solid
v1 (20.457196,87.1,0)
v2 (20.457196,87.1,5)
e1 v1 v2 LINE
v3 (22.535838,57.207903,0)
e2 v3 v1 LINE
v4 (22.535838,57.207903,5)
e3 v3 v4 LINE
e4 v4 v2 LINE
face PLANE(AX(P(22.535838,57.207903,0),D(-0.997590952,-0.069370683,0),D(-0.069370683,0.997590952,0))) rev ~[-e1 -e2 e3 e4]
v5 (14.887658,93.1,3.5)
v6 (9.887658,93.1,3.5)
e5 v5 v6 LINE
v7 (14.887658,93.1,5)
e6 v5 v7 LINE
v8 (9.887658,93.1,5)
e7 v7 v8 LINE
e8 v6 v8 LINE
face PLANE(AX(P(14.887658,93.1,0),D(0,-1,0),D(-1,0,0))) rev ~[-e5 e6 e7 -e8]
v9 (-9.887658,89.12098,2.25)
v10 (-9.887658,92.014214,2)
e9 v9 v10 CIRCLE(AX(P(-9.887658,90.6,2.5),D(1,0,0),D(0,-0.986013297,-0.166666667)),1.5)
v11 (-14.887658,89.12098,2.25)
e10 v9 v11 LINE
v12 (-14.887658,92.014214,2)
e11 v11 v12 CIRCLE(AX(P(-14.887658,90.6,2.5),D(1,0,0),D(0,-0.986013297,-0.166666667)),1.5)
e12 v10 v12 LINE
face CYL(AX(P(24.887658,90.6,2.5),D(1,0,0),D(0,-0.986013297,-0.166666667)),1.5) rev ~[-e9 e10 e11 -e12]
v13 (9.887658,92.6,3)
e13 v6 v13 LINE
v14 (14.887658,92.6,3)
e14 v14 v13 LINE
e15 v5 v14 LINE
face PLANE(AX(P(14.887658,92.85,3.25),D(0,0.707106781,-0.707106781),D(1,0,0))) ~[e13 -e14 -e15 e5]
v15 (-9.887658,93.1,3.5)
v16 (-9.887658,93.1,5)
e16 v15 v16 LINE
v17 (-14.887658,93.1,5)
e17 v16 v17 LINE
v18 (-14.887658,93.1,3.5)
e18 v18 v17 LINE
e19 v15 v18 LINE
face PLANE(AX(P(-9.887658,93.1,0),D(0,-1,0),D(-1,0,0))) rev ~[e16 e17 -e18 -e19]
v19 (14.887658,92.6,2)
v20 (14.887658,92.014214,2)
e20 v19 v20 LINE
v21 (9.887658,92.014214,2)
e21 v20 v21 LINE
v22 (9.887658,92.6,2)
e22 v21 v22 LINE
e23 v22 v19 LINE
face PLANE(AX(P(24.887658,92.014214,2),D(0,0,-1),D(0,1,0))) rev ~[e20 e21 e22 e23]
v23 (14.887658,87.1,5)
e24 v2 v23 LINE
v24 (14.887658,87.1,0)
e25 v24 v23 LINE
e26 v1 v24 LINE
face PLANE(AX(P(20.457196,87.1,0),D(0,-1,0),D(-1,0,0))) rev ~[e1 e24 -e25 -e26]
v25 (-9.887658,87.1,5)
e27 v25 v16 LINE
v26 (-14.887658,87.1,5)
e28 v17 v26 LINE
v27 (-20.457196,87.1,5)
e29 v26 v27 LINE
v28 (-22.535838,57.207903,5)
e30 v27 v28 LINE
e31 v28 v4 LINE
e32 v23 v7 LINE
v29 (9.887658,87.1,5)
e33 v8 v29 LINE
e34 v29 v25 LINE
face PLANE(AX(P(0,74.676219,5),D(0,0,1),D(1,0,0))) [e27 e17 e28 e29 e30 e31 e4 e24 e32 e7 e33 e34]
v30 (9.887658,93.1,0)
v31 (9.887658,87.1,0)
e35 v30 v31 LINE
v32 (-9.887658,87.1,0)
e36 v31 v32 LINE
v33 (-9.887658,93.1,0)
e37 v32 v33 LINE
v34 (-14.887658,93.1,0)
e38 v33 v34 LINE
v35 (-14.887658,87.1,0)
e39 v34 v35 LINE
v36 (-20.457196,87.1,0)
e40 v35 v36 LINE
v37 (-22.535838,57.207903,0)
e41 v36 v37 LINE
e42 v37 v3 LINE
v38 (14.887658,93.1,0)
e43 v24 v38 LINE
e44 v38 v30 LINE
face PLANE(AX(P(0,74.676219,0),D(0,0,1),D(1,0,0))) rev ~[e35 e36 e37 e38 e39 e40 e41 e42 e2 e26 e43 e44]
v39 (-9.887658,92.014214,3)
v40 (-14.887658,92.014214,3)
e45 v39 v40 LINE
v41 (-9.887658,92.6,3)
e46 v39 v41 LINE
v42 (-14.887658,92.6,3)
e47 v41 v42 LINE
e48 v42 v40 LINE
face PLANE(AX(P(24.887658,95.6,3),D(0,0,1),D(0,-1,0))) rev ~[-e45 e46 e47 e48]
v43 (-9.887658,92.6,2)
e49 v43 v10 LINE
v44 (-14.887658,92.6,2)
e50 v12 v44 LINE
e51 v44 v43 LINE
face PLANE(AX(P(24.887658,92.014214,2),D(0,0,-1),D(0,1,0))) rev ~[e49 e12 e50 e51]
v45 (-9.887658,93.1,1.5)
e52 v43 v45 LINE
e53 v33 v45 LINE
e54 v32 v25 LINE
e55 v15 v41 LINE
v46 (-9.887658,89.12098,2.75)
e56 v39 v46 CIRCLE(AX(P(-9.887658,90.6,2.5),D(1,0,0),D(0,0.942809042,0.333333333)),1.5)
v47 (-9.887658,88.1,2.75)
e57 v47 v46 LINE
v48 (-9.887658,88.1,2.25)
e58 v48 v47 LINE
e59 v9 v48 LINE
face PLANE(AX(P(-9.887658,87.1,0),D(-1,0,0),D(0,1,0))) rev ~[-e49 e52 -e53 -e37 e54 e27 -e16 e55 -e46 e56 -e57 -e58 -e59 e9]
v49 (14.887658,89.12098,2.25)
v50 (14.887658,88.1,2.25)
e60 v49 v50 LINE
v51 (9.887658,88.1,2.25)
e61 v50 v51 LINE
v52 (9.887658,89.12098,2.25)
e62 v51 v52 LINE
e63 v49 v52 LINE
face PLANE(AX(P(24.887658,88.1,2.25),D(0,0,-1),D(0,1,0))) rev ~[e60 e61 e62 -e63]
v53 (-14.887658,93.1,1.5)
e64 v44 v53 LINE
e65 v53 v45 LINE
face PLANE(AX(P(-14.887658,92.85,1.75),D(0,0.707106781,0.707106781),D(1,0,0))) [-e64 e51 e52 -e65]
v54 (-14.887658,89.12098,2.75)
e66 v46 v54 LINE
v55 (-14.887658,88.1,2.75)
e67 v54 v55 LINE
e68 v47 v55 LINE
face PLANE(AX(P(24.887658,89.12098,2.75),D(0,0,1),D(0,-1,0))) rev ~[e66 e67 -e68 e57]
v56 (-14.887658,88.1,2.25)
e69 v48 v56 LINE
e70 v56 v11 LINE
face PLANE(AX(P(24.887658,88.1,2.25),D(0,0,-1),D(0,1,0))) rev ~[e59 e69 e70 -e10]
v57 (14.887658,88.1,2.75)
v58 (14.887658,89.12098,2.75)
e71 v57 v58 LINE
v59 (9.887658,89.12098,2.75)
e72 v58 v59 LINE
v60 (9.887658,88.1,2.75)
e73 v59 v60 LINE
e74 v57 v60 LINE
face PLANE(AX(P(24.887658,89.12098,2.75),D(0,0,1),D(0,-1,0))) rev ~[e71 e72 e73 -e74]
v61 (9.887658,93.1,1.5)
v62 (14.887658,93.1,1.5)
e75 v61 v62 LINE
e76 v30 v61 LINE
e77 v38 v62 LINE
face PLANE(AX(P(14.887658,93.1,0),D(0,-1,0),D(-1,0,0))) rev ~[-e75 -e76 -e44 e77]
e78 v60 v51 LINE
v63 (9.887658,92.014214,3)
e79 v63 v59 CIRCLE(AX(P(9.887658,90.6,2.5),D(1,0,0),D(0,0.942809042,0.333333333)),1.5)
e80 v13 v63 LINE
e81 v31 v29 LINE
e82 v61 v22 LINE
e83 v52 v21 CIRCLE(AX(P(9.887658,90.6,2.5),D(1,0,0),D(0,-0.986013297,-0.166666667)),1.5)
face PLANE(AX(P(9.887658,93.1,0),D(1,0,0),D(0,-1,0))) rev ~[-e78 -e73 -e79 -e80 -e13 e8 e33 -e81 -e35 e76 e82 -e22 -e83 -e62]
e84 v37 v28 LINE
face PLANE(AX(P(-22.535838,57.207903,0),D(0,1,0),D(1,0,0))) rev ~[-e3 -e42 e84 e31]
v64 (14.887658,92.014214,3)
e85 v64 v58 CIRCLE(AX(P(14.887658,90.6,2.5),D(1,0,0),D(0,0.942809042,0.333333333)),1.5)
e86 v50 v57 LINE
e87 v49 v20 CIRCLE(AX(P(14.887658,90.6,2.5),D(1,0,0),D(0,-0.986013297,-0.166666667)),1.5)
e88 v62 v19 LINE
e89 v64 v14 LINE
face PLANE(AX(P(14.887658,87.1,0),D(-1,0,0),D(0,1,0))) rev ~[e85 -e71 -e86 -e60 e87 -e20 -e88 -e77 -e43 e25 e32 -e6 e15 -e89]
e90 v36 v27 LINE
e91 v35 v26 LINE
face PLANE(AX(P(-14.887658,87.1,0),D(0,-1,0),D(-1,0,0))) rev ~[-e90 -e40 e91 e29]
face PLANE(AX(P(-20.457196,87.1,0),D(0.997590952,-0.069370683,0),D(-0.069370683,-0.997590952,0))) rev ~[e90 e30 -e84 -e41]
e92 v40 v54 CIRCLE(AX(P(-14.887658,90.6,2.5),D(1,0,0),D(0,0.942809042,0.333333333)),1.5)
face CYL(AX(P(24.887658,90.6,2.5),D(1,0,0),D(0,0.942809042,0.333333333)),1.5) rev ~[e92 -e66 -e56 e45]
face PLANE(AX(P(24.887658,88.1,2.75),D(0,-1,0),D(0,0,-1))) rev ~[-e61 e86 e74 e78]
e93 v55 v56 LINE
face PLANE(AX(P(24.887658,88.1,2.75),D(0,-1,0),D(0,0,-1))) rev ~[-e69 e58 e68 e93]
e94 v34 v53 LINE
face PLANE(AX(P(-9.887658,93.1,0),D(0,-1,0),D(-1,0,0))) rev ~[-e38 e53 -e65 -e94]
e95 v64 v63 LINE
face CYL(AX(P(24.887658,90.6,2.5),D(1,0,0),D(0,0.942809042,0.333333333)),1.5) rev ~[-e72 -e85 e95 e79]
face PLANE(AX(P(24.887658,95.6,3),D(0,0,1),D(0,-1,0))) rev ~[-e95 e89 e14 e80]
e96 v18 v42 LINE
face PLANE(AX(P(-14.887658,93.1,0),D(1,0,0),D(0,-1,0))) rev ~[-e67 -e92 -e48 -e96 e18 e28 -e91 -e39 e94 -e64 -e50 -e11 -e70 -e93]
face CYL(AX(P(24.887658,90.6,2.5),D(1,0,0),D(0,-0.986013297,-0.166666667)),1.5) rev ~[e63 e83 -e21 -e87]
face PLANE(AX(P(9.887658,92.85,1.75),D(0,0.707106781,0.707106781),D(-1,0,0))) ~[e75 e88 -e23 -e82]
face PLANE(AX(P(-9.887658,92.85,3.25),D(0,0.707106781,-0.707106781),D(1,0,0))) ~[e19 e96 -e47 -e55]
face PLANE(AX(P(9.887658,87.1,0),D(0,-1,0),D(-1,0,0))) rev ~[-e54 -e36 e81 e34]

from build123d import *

# Parameters (mm, degrees)
F1_DEPTH = 5
F4_DEPTH = 45.5
F5_SIZE  = 0.5


with BuildPart() as f1:
    # F0 (on Top) → F1 (new body)
    with BuildSketch(Plane.XY):
        Polygon((-14.8876575074, 87.1), (-20.4571957112, 87.1), (-22.5358384183, 57.2079033579), (22.5358384183, 57.2079033579), (20.4571957112, 87.1), (14.8876575074, 87.1), (14.8876575074, 93.1), (9.8876575074, 93.1), (9.8876575074, 87.1), (-9.8876575074, 87.1), (-9.8876575074, 93.1), (-14.8876575074, 93.1), align=None)
    extrude(amount=F1_DEPTH)

    # F3 (on offset) → F4 (cut)
    with BuildSketch(Plane.YZ.offset(24.8876575074)):
        with BuildLine():
            Line((95.6, 3), (92.0142135624, 3))
            ThreePointArc((92.0142135624, 3), (90.4708684127, 3.9944313411), (89.1209800542, 2.75))
            Line((89.1209800542, 2.75), (88.1, 2.75))
            Line((88.1, 2.75), (88.1, 2.25))
            Line((88.1, 2.25), (89.1209800542, 2.25))
            ThreePointArc((89.1209800542, 2.25), (90.4708684127, 1.0055686589), (92.0142135624, 2))
            Line((92.0142135624, 2), (95.6, 2))
            Line((95.6, 2), (95.6, 3))
        make_face()
    extrude(amount=-F4_DEPTH, mode=Mode.SUBTRACT)

    # F5
    f5_edges = [f1.edges().sort_by_distance(p)[0] for p in [
        (-12.387658, 93.1, 3),
        (-12.387658, 93.1, 2),
        (12.387658, 93.1, 3),
        (12.387658, 93.1, 2),
    ]]
    chamfer(f5_edges, length=F5_SIZE)


solid = f1.part
